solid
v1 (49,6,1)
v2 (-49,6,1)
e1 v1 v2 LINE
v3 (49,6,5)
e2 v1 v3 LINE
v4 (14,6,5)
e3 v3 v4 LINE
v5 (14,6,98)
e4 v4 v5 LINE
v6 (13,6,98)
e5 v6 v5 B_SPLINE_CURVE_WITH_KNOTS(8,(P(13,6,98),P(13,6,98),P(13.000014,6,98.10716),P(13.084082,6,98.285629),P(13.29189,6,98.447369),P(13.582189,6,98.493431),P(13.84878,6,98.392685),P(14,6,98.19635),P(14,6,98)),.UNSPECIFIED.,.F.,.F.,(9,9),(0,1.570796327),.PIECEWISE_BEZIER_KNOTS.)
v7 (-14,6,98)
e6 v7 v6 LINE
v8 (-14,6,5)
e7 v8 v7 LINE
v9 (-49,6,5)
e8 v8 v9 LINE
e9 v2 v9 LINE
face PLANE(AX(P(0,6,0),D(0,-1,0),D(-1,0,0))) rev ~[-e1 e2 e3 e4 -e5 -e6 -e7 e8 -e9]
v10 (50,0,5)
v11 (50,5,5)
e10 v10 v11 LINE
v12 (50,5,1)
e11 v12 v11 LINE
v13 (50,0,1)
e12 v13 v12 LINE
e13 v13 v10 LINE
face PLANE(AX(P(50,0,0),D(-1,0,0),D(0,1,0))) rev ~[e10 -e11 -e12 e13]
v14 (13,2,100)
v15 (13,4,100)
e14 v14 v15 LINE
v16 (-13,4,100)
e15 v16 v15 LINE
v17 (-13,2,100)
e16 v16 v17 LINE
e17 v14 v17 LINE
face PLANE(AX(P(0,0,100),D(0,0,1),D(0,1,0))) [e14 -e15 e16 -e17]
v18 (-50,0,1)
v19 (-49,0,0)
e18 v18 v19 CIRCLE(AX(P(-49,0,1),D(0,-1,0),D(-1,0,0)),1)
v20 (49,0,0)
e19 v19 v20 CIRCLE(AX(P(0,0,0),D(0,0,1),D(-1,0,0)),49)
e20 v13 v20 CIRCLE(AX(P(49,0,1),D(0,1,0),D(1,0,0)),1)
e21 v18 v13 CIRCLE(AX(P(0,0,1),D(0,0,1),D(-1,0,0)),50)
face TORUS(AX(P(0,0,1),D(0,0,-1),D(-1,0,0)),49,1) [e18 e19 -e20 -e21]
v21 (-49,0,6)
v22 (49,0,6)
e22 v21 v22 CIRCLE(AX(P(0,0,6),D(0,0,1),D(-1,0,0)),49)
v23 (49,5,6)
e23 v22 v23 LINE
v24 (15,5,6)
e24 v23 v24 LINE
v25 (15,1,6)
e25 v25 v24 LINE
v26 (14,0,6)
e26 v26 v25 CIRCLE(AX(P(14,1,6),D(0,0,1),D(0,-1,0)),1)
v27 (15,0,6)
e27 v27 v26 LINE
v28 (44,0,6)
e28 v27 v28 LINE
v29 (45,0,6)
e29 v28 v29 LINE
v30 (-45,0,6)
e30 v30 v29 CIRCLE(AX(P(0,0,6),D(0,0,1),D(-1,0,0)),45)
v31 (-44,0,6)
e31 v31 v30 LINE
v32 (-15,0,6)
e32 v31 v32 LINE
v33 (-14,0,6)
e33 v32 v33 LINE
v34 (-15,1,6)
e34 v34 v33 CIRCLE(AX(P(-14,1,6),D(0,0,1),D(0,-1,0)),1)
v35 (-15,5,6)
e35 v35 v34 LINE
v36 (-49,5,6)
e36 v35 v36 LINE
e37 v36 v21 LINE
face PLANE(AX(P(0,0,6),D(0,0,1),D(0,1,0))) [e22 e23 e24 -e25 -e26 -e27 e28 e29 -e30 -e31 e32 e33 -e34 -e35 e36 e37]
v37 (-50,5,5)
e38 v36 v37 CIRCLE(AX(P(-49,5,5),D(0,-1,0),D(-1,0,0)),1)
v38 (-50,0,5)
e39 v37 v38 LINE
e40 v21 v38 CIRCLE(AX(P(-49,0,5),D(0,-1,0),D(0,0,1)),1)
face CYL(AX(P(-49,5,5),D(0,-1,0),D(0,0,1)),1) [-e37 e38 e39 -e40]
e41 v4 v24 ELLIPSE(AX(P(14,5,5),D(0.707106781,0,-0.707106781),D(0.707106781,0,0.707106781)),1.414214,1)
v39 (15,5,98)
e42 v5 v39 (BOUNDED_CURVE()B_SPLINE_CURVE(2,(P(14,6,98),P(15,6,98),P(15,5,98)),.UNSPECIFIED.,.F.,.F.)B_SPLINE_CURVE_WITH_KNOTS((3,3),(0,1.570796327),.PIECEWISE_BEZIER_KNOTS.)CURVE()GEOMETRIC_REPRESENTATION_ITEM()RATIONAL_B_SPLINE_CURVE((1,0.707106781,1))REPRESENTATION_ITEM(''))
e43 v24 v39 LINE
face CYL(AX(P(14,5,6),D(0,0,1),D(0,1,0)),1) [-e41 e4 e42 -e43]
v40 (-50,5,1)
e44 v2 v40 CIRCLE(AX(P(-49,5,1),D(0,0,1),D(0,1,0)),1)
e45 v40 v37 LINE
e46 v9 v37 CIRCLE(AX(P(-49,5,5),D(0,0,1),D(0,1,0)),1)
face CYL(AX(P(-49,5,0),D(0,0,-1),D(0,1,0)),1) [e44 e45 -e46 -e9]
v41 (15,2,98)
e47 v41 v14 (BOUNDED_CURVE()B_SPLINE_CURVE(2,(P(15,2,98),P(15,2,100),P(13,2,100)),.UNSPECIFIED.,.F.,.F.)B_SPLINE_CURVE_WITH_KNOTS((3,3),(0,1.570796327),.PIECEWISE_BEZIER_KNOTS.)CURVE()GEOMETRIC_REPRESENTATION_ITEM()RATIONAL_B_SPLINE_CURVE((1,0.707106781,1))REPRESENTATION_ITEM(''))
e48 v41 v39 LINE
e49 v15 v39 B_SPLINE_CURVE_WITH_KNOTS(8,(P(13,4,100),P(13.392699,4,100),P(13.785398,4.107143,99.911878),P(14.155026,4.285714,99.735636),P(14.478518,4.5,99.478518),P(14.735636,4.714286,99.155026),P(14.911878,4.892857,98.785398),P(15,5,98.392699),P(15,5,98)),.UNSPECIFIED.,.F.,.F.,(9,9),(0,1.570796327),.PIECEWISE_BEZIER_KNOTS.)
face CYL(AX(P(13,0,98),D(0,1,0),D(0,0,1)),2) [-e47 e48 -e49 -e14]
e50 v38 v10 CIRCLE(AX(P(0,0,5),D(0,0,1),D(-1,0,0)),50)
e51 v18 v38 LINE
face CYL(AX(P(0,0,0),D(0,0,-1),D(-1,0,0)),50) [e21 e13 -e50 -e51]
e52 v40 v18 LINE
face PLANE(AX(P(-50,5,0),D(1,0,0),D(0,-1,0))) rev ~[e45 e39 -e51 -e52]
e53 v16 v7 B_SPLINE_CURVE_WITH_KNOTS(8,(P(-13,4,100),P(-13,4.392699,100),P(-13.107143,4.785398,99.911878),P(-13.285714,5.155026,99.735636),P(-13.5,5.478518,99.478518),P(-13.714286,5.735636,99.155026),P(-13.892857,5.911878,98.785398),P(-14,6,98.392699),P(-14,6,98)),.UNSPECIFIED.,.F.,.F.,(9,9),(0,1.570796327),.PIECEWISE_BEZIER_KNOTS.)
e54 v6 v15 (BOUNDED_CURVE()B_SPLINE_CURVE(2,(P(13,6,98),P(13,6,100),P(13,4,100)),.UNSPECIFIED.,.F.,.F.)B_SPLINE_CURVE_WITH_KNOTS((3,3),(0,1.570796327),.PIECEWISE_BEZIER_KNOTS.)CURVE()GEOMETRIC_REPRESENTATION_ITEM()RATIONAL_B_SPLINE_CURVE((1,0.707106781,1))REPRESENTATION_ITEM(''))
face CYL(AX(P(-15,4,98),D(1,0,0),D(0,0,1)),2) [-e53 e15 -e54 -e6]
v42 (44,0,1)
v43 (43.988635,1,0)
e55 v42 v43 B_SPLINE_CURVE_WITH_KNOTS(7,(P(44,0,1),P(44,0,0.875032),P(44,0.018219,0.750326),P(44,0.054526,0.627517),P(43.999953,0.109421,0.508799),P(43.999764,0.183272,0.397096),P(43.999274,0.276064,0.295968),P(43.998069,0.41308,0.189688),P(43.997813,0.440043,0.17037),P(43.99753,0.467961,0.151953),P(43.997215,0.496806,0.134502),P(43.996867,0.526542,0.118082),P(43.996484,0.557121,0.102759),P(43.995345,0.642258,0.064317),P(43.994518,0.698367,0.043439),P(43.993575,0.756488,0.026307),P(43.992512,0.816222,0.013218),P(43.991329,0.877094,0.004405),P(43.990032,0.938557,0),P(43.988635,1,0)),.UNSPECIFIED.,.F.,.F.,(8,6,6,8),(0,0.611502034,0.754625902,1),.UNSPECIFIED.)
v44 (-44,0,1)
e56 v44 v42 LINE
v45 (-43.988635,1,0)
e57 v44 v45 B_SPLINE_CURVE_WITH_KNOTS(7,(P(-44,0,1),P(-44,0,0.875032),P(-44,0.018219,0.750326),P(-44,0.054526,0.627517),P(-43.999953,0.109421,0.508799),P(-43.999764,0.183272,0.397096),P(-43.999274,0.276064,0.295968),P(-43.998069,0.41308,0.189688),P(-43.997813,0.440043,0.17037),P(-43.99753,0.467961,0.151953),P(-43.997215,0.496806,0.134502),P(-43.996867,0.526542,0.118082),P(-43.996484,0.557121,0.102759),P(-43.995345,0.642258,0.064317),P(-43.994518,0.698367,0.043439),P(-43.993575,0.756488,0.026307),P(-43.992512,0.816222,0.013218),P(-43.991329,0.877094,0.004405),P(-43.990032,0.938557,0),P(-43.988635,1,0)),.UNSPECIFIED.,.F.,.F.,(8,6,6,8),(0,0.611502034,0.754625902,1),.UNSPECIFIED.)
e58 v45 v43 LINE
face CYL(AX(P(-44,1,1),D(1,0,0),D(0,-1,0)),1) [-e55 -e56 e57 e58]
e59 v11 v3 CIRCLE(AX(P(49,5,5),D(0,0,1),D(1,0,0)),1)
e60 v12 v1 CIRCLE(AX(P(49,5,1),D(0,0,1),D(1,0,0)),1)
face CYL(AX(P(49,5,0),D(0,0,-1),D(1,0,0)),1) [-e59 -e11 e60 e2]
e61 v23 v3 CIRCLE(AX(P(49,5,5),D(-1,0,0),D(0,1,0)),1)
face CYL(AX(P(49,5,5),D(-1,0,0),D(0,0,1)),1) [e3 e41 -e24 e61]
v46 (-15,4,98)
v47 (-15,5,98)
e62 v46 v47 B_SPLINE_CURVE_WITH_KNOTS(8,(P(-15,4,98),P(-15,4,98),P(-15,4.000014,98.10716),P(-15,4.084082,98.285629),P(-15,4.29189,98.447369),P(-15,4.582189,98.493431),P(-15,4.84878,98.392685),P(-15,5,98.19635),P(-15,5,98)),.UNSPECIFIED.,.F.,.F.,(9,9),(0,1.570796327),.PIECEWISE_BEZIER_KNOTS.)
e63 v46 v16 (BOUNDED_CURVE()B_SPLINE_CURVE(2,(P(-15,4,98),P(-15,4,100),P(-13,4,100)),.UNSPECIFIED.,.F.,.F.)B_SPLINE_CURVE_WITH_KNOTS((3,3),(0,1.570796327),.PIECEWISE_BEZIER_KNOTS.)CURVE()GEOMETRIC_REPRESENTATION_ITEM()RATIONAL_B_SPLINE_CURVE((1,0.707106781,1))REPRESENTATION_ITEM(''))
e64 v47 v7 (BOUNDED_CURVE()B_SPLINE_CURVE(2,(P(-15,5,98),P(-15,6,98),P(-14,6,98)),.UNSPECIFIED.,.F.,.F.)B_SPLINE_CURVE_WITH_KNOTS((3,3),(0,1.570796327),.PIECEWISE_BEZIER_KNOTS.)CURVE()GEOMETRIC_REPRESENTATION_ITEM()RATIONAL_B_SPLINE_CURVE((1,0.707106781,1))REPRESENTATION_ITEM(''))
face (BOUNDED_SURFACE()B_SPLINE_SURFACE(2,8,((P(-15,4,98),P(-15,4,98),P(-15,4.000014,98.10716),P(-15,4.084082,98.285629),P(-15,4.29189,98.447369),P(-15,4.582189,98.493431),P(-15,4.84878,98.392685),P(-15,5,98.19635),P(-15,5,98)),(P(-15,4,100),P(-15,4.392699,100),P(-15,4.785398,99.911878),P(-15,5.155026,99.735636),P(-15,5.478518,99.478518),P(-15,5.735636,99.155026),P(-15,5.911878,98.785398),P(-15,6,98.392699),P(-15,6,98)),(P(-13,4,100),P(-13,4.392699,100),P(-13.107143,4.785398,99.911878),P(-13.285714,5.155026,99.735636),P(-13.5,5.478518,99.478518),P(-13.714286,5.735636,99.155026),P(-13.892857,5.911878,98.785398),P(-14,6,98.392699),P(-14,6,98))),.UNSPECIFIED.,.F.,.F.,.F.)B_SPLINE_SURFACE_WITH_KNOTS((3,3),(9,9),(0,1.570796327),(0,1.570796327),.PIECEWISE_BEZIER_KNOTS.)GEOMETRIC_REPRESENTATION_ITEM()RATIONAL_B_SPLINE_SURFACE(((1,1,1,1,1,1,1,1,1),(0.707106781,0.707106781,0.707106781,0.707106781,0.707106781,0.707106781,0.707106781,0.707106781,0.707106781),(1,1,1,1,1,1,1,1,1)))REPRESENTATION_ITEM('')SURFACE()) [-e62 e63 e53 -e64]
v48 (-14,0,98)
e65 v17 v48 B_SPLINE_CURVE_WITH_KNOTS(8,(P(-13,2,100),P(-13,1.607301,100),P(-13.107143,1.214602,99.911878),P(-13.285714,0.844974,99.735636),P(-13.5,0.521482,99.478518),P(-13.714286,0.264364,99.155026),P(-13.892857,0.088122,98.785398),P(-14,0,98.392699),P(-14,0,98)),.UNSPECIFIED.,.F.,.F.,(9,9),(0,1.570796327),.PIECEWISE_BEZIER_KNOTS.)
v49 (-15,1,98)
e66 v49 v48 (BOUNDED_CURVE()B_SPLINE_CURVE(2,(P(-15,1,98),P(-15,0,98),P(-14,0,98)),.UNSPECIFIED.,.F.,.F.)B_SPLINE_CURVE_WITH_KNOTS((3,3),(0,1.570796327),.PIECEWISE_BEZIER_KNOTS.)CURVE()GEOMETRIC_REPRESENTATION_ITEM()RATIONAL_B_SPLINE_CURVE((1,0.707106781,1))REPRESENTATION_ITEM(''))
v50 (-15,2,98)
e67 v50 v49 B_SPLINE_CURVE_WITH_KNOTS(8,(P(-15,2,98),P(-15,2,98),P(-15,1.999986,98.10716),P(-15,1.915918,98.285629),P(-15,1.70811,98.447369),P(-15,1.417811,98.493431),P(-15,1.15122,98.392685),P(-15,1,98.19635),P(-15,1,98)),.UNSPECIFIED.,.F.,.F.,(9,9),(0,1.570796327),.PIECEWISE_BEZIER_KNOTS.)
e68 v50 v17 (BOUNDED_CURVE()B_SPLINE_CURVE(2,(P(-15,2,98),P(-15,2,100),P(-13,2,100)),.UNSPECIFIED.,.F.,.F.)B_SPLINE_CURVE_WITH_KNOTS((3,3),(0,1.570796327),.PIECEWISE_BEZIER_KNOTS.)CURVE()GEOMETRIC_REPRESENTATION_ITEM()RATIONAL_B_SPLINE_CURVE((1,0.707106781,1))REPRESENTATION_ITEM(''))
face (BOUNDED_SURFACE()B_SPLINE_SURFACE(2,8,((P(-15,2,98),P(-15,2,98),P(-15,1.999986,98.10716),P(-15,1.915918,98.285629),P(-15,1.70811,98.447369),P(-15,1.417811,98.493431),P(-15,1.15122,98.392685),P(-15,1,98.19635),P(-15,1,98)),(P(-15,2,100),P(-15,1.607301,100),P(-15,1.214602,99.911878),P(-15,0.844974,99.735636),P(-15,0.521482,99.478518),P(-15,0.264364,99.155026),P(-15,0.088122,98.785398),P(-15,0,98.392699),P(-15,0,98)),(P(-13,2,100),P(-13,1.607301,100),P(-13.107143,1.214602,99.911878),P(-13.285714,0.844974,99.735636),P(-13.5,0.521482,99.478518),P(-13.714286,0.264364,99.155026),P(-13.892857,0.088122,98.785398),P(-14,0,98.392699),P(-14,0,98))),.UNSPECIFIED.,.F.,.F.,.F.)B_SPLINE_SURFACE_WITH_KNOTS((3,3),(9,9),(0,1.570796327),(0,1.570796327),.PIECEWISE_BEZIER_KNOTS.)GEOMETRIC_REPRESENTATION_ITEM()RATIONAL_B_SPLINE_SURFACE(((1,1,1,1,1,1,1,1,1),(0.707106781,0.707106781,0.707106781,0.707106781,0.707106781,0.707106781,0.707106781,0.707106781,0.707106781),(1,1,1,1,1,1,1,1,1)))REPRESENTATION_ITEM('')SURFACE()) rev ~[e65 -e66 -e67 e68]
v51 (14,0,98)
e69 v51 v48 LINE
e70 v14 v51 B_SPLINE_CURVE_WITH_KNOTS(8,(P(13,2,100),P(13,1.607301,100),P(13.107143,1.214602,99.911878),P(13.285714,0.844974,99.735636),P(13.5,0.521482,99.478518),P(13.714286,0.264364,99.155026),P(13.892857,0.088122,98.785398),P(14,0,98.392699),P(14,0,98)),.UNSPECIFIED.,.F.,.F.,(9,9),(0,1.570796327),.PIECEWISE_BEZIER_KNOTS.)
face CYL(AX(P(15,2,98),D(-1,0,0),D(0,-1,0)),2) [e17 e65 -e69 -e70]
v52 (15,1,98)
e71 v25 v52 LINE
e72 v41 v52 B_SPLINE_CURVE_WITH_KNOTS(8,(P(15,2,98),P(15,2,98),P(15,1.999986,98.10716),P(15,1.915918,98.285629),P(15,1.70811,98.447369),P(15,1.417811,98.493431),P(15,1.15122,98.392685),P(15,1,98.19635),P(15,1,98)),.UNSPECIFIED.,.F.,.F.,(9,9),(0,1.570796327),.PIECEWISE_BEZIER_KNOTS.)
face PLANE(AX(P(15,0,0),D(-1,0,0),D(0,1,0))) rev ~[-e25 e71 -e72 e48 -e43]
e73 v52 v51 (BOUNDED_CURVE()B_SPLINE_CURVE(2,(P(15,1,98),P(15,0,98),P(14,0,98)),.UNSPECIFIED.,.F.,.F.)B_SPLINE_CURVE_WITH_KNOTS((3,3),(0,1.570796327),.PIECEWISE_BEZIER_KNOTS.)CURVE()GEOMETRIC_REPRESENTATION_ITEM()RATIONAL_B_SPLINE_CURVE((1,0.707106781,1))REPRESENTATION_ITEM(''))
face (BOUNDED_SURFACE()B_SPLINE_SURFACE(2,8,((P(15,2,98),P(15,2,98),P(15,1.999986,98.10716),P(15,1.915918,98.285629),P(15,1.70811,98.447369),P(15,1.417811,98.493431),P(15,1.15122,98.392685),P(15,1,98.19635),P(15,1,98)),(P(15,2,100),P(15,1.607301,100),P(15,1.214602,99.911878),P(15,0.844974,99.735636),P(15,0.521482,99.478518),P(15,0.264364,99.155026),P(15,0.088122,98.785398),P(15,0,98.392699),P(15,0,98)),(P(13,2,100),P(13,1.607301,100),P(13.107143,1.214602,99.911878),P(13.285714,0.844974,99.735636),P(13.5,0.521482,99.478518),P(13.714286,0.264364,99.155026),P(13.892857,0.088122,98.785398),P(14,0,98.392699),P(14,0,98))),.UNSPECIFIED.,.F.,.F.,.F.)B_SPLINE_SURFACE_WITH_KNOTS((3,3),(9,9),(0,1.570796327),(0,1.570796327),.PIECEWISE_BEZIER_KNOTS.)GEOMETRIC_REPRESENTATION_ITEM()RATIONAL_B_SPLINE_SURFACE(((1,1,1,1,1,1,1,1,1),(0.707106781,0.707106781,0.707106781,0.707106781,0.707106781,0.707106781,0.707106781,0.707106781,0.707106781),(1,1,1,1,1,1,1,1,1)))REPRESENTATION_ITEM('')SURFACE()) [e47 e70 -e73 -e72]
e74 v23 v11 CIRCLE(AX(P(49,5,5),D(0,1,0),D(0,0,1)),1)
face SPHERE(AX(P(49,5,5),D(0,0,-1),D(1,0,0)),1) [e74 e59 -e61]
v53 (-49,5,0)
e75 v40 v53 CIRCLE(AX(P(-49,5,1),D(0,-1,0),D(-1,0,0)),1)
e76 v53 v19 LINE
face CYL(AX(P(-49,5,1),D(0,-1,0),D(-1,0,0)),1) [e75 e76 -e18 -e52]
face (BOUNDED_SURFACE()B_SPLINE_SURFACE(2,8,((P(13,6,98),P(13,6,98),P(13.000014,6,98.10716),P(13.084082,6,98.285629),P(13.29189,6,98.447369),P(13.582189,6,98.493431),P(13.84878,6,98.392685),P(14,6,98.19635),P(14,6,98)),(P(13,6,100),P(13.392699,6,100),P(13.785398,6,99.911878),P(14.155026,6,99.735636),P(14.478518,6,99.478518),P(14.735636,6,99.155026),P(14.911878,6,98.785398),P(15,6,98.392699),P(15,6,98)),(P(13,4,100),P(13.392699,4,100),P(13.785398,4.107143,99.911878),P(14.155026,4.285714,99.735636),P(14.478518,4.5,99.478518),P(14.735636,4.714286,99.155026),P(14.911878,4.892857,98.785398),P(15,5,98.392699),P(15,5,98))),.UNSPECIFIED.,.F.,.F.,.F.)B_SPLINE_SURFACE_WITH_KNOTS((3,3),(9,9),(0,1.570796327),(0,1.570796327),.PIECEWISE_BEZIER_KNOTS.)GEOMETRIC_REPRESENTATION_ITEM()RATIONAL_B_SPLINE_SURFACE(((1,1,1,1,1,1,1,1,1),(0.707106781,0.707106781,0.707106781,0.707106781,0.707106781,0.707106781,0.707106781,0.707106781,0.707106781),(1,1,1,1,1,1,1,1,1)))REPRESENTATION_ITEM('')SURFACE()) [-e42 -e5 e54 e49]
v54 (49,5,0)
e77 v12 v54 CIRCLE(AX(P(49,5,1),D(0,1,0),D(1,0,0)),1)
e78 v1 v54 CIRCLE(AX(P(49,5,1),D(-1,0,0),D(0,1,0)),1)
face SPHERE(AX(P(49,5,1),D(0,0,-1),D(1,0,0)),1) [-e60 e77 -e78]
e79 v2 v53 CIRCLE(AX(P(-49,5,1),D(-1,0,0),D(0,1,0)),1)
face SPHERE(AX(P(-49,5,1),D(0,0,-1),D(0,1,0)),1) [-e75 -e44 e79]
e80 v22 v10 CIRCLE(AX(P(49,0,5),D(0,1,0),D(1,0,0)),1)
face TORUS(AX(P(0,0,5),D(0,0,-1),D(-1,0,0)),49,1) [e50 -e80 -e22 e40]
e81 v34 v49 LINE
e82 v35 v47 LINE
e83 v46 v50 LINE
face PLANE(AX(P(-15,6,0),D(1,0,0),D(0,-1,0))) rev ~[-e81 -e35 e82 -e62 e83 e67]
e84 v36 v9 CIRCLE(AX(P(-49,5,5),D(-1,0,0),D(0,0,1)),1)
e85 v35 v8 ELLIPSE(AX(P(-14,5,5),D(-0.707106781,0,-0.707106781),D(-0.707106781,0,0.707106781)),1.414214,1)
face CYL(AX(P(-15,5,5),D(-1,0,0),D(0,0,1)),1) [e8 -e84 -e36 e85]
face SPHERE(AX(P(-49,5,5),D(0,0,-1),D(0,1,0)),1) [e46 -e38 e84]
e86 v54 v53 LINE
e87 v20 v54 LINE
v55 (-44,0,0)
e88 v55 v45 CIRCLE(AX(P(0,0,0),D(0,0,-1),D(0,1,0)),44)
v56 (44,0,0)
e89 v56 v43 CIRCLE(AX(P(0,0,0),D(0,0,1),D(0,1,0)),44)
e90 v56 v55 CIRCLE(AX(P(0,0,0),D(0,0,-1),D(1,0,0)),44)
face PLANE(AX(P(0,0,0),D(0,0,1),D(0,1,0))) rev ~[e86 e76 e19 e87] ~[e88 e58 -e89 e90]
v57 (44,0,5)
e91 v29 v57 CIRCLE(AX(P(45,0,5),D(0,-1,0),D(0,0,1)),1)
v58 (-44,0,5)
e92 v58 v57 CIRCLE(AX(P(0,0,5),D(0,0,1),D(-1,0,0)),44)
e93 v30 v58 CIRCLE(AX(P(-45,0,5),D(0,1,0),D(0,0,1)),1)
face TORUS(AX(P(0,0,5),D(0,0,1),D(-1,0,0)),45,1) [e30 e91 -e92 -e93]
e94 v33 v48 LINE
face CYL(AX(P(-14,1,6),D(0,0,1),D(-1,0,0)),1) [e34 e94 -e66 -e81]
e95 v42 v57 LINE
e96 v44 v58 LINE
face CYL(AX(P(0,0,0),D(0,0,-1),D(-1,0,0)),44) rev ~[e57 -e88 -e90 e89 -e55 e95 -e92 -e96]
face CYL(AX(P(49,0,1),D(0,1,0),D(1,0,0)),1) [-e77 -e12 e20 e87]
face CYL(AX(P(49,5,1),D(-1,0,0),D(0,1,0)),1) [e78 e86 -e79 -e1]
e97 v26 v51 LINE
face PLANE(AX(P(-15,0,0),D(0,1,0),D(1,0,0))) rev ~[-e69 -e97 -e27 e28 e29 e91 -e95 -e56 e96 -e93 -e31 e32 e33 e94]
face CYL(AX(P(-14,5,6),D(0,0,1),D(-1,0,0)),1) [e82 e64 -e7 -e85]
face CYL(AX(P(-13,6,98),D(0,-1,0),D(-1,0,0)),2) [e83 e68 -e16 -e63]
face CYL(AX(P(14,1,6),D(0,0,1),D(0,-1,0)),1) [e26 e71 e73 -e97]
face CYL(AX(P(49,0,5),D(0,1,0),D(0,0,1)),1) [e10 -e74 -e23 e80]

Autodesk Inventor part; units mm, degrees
ref_plane "YZ Plane" through (0, 0, 0) normal (1, 0, 0) x (0, 1, 0)
ref_plane "XZ Plane" through (0, 0, 0) normal (0, 1, 0) x (-1, 0, 0)
ref_plane "XY Plane" through (0, 0, 0) normal (0, 0, 1) x (1, 0, 0)
sketch "Sketch1" plane through (0, 0, 0) normal (0, 0, 1) x (0, 1, 0)
  line L0 (0, 15) -> (0, -15)
  line L1 (0, -15) -> (6, -15)
  line L2 (6, -15) -> (6, 15)
  line L3 (6, 15) -> (0, 15)
  line L4 (5, 50) -> (0, 50)
  line L5 (0, 50) -> (0, -50)
  line L6 (0, -50) -> (5, -50)
  line L7 (6, -49) -> (6, 49)
  line L8 (-61.2414, 0) -> (17.4485, 0) projected
  arc A0 (0, 50) -> (0, -50) centre (0, 0) ccw
  arc A1 (0, 44) -> (0, -44) centre (0, 0) ccw
  arc A2 (6, 49) -> (5, 50) centre (5, 49) ccw
  arc A3 (5, -50) -> (6, -49) centre (5, -49) ccw
  dimension "d0" = 30
  dimension "d1" = 6
  dimension "d4" = 100
  dimension "d5" = 6
  dimension "d6" = 1
extrude "Extrusion1" add sketch "Sketch1" along normal blind 100 contours L3 L2 L8 L0 | L8 L2 L1 L0
extrude "Extrusion2" add sketch "Sketch1" along normal blind 6 contours L5 L4 A2 L7 L3 | A1 L8 A0 L5 | L1 L7 A3 L6 L5 | A1 L5 A0 L8
fillet "Fillet1" radius 2 4 edges at (0, 0, 100) (15, 3, 100) (0, 6, 100) (-15, 3, 100)
fillet "Fillet1" radius 1 19 edges at (-15, 0, 53) (-15, 6, 53) (0, 6, 0) (15, 6, 53) (15, 0, 53) (0, 0, 0) (-49.7071, 5.7071, 0) (-50, 2.5, 0) (0, -50, 0) (50, 2.5, 0) (49.7071, 5.7071, 0) (0, -50, 6) (0, -44, 6) (-50, 2.5, 6) (-49.7071, 5.7071, 6) (49.7071, 5.7071, 6) (50, 2.5, 6) (32, 6, 6) (-32, 6, 6)
properties part number "band_stand"
